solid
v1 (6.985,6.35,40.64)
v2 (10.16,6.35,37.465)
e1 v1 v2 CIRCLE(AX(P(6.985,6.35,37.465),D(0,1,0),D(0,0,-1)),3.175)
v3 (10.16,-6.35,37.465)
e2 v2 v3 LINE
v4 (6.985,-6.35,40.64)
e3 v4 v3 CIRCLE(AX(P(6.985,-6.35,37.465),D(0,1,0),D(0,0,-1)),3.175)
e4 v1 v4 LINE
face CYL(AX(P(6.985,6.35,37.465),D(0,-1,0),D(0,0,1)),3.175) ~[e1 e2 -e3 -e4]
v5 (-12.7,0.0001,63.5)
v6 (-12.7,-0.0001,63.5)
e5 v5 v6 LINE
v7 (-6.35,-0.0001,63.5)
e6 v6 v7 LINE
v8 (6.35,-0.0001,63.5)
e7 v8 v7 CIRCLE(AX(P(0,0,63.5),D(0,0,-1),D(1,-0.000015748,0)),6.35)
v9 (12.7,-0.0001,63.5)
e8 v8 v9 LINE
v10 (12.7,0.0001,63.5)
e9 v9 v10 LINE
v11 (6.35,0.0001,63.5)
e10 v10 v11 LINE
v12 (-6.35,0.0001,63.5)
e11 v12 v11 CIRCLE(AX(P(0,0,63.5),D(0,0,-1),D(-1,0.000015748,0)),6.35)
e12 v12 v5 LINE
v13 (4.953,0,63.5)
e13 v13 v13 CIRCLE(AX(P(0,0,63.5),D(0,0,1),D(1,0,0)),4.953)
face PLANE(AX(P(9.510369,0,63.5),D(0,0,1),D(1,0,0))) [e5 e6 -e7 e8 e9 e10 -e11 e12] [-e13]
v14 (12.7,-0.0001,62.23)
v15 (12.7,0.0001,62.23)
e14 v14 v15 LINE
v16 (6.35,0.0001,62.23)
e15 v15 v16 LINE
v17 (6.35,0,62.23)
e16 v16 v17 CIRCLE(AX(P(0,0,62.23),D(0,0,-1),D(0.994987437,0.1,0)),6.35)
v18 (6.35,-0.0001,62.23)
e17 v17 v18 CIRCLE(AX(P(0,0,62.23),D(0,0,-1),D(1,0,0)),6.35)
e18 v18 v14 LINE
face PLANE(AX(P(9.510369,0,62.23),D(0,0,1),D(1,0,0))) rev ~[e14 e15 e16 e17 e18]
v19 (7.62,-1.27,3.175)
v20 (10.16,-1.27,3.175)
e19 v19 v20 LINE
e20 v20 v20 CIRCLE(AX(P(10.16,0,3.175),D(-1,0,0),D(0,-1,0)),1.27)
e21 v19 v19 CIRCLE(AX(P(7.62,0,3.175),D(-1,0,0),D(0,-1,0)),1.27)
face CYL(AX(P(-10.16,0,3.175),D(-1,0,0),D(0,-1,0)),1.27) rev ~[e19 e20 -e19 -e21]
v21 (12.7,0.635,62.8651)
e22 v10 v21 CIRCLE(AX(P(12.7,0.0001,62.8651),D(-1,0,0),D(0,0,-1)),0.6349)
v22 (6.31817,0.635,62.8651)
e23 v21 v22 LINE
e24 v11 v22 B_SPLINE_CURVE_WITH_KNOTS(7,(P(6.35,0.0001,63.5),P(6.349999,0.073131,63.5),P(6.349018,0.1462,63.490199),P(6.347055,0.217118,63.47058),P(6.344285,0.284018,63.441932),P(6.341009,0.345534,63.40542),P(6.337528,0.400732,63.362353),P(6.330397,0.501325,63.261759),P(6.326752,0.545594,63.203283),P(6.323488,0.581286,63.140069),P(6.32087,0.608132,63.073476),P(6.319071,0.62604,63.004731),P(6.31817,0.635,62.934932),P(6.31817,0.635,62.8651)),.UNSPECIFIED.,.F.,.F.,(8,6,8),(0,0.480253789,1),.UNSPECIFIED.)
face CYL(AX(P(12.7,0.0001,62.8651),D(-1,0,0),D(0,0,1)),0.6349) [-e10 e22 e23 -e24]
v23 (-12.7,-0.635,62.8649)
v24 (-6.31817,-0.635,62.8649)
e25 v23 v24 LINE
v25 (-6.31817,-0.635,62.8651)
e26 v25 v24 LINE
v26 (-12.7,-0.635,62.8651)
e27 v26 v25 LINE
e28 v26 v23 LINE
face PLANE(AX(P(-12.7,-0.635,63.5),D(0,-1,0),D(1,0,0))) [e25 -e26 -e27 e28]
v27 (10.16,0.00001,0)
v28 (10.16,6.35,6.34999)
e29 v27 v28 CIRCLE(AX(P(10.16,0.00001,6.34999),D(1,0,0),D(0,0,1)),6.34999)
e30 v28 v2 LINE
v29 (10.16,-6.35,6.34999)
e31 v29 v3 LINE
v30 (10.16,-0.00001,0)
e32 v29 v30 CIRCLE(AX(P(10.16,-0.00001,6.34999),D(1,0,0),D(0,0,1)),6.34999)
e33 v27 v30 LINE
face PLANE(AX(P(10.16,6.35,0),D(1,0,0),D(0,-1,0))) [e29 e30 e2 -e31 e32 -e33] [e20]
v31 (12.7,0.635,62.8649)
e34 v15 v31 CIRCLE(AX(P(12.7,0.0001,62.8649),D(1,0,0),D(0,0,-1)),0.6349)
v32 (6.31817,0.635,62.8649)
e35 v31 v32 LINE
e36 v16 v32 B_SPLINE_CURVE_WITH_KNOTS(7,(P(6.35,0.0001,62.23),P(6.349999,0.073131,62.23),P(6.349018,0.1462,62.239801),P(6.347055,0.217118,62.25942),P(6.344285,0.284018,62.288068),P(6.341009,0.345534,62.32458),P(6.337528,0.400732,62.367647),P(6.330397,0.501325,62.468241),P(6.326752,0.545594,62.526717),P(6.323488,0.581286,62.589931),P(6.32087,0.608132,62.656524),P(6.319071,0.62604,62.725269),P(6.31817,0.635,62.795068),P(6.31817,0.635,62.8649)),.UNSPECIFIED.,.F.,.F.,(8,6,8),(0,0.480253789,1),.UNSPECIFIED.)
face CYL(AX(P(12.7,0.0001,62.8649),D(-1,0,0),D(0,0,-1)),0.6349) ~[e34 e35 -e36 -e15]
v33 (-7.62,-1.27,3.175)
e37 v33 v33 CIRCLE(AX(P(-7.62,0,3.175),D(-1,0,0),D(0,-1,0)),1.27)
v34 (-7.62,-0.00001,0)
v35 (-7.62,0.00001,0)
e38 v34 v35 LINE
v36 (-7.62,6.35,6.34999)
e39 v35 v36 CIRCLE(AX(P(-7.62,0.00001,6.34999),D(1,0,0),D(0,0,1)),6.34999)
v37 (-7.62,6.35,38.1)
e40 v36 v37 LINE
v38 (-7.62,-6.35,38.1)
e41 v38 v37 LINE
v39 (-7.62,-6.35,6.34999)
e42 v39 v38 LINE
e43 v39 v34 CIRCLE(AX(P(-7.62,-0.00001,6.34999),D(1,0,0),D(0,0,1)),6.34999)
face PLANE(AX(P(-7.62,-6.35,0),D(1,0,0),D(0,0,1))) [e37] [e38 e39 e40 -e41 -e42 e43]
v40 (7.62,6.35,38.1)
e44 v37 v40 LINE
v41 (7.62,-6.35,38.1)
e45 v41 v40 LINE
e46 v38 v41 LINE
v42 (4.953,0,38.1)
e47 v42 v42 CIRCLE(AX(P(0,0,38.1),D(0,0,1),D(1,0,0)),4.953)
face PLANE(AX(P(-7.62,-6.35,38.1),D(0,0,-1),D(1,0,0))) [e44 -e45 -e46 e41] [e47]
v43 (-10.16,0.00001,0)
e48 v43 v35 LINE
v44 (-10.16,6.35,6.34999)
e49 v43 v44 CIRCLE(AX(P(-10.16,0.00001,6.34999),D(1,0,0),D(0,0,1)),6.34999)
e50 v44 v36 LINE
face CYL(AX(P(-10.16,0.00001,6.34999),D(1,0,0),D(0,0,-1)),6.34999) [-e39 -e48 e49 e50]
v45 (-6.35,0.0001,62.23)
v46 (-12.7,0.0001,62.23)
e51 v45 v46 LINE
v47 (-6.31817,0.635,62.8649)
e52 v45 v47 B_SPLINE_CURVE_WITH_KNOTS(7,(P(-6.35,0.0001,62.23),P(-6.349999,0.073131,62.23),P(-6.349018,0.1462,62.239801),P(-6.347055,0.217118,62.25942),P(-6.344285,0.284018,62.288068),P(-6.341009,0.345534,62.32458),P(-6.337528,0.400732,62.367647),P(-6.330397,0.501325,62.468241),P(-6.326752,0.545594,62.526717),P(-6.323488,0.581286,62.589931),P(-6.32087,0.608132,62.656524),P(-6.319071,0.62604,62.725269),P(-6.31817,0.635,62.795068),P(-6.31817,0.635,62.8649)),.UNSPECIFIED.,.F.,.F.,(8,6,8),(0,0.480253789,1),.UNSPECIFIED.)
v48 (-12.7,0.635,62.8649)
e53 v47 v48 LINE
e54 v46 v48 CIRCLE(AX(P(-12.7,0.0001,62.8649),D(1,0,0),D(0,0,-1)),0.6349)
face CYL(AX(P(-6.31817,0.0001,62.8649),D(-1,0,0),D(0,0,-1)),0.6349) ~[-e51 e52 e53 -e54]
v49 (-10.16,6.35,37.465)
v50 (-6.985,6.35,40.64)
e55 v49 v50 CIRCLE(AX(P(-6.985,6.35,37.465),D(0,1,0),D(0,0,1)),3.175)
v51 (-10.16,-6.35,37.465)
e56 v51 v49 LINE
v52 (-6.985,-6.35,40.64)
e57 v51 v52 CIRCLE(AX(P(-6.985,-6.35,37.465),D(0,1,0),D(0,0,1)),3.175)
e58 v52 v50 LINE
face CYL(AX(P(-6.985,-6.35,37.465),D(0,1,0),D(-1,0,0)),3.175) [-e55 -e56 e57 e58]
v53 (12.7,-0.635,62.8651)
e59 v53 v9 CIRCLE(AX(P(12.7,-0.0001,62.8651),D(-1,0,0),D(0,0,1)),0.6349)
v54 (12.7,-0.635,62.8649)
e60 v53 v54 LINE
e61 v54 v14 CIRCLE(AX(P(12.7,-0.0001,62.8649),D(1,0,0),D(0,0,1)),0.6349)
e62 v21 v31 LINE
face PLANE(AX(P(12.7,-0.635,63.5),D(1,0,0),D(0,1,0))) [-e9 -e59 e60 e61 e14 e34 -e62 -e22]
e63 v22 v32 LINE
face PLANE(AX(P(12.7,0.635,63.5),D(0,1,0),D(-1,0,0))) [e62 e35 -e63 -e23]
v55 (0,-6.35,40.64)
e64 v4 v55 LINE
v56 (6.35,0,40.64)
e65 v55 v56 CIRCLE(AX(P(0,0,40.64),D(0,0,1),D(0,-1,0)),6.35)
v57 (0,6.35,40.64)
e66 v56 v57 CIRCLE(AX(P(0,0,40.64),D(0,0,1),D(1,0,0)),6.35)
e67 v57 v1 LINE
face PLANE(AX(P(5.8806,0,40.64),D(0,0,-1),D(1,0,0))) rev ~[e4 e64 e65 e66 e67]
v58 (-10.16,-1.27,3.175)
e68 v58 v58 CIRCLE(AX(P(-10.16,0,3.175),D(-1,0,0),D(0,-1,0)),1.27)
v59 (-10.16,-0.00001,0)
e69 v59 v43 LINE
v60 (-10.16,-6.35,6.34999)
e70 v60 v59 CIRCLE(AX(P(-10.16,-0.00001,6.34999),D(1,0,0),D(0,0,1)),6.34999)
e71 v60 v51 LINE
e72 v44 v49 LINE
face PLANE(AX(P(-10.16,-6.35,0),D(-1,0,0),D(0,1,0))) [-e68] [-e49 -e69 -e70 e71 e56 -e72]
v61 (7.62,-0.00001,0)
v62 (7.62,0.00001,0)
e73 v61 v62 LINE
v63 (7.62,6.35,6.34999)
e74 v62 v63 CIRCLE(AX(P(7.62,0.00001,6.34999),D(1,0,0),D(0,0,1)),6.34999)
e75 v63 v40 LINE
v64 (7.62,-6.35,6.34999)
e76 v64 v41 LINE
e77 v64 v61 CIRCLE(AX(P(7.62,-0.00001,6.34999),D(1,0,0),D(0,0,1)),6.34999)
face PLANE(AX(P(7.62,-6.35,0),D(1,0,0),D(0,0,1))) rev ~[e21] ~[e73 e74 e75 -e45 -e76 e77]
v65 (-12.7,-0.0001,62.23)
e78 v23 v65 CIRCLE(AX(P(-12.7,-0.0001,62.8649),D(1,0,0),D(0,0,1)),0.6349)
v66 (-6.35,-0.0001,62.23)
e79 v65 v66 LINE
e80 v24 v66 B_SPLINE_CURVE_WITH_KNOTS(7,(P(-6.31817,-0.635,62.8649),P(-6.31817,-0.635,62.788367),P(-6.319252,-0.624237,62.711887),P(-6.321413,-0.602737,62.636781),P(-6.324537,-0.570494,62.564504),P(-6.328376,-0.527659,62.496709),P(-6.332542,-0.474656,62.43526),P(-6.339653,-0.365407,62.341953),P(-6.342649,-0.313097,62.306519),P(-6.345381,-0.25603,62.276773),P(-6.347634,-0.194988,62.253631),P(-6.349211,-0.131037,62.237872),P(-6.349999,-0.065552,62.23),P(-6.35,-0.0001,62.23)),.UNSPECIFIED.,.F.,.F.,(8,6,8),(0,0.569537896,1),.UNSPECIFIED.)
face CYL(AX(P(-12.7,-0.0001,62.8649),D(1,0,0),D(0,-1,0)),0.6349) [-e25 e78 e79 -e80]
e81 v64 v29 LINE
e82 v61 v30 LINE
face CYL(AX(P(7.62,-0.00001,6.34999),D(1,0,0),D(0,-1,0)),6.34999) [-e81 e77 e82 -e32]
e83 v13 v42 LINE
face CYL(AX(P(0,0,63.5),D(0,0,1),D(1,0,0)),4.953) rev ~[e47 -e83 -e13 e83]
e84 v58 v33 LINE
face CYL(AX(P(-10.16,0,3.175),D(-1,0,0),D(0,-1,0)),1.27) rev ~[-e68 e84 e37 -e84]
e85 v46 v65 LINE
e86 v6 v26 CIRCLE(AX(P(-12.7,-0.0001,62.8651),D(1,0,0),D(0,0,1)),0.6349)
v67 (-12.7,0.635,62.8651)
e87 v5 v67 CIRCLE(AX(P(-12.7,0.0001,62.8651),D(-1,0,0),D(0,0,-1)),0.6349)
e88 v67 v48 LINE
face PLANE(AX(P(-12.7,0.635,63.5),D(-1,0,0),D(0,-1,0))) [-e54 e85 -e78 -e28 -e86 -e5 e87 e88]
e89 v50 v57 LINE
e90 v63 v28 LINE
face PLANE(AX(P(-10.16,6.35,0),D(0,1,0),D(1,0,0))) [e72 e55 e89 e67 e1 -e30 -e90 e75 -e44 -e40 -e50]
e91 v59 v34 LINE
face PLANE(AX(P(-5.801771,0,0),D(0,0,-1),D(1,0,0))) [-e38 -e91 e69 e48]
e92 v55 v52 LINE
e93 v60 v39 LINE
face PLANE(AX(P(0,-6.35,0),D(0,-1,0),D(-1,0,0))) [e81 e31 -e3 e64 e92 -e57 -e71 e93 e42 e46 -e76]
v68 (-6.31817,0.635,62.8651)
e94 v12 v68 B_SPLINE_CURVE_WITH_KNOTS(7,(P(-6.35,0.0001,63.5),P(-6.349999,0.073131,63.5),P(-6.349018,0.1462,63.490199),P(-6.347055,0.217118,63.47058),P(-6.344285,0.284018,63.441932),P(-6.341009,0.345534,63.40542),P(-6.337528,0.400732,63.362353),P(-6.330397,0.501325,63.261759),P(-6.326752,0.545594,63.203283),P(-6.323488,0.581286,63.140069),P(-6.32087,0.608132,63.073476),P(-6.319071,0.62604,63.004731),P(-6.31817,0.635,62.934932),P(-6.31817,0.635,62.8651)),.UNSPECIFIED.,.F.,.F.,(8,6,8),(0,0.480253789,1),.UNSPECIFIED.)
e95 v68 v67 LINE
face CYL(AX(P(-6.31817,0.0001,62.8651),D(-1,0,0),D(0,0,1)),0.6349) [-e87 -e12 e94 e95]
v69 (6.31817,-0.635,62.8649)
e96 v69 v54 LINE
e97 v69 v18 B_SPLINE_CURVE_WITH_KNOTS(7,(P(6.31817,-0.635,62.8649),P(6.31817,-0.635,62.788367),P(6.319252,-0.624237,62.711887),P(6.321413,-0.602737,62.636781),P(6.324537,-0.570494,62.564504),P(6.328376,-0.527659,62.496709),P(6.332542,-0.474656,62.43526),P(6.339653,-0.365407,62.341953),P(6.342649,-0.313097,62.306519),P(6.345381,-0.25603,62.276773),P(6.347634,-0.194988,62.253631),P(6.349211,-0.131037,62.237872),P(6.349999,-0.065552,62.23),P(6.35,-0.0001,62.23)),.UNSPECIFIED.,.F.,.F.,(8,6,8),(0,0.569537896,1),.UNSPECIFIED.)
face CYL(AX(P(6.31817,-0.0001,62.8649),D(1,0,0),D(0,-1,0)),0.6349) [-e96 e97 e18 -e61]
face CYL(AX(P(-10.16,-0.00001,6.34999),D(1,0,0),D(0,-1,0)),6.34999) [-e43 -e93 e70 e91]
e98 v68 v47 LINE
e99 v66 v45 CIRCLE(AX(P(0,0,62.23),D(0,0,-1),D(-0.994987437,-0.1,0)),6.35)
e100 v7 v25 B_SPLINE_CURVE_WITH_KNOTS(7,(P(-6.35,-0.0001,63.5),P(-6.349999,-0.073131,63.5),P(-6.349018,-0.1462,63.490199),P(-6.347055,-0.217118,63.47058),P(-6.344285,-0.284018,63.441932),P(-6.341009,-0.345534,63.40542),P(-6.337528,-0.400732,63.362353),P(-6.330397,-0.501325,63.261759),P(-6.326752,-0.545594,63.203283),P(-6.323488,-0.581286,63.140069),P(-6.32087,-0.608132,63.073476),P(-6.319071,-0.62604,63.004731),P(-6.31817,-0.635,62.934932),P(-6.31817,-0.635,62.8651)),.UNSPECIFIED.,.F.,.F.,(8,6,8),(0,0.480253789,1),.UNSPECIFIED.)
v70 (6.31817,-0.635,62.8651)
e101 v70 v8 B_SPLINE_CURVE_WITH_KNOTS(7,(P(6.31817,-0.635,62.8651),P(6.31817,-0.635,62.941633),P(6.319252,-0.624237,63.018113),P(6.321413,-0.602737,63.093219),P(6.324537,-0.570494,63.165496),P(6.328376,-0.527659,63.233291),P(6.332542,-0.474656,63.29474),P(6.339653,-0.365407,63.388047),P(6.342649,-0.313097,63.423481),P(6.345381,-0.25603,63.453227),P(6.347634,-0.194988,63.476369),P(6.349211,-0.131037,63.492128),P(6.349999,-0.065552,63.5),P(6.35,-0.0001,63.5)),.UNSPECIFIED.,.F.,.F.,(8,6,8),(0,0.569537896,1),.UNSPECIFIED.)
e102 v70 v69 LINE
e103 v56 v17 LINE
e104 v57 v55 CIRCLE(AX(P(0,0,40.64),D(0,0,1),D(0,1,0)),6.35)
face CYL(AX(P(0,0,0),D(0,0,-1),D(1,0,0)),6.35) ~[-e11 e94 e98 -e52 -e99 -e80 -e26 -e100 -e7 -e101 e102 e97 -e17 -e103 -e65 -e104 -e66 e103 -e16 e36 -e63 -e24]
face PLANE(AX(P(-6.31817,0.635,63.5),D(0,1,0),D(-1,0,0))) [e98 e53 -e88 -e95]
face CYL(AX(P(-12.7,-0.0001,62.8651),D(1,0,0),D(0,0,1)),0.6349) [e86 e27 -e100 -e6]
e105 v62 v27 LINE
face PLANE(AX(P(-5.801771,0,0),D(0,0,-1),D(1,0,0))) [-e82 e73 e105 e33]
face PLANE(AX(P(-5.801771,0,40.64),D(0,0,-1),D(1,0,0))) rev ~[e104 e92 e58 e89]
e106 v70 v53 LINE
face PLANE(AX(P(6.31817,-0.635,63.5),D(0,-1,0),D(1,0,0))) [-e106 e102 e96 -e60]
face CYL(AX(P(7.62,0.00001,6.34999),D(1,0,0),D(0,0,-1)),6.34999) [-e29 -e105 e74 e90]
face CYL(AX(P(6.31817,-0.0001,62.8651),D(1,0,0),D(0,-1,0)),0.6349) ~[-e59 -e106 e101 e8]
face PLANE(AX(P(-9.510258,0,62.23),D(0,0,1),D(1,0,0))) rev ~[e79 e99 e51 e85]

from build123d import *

# Parameters (mm, degrees)
F0_R      = 6.35
F0_R_2    = 0.635
F1_DEPTH  = 63.5
F3_DEPTH  = 1.27
F4_R      = 0.6349
F5_R      = 0.635
F6_DEPTH  = 40.64
F7_R      = 1.27
F8_DEPTH  = 25.4
F9_W      = 15.24
F9_H      = 38.1
F10_DEPTH = 12.7
F11_R     = 4.953
F11_R_2   = 0.635
F12_DEPTH = 25.4
F13_R     = 6.34999
F14_R     = 3.175


# Not quite as in the source:
# - a fillet or chamfer is up to 0.001 mm smaller than in the source, because OpenCascade refuses the exact size


with BuildPart() as f1:
    # F0 (on Top) → F1 (new body)
    with BuildSketch(Plane.XY):
        Circle(F0_R)
        Circle(F0_R_2, mode=Mode.SUBTRACT)
    extrude(amount=F1_DEPTH)

    # F2 (on face) → F3 (join)
    with BuildSketch(Plane.XY.offset(63.5)):
        with BuildLine():
            Line((6.3181702256, -0.635), (12.7, -0.635))
            Line((12.7, -0.635), (12.7, 0.635))
            Line((12.7, 0.635), (6.3181702256, 0.635))
            ThreePointArc((6.3181702256, 0.635), (6.3420375643, 0.3178986216), (6.35, 0))
            ThreePointArc((6.35, 0), (6.3420375643, -0.3178986216), (6.3181702256, -0.635))
        make_face()
        with BuildLine():
            Line((-12.7, -0.635), (-6.3181702256, -0.635))
            ThreePointArc((-6.3181702256, -0.635), (-6.35, 0), (-6.3181702256, 0.635))
            Line((-6.3181702256, 0.635), (-12.7, 0.635))
            Line((-12.7, 0.635), (-12.7, -0.635))
        make_face()
    extrude(amount=-F3_DEPTH)

    # F4 (radius 0.635 in the source; OpenCascade refuses exactly that, so slightly less here)
    f4_edges = [f1.edges().sort_by_distance(p)[0] for p in [
        (9.509085, 0.635, 63.5),
        (9.509085, -0.635, 63.5),
        (-9.509085, 0.635, 63.5),
        (-9.509085, -0.635, 63.5),
        (9.509085, 0.635, 62.23),
        (9.509085, -0.635, 62.23),
        (-9.509085, -0.635, 62.23),
        (-9.509085, 0.635, 62.23),
    ]]
    fillet(f4_edges, radius=F4_R)

    # F5 (on face) → F6 (join)
    with BuildSketch(Plane(origin=(0, 0, 0), x_dir=(1, 0, 0), z_dir=(0, 0, -1))):
        with BuildLine():
            ThreePointArc((0, -6.35), (-6.35, 0), (0, 6.35))
            Line((0, 6.35), (-10.16, 6.35))
            Line((-10.16, 6.35), (-10.16, -6.35))
            Line((-10.16, -6.35), (0, -6.35))
        make_face()
        with BuildLine():
            Line((10.16, -6.35), (10.16, 6.35))
            Line((10.16, 6.35), (0, 6.35))
            ThreePointArc((0, 6.35), (4.4901280605, 4.4901280605), (6.35, 0))
            ThreePointArc((6.35, 0), (4.4901280605, -4.4901280605), (0, -6.35))
            Line((0, -6.35), (10.16, -6.35))
        make_face()
        Circle(F5_R)
    extrude(amount=-F6_DEPTH)

    # F7 (on face) → F8 (cut)
    with BuildSketch(Plane(origin=(-10.16, 0, 0), x_dir=(0, -1, 0), z_dir=(-1, 0, 0))):
        with Locations((0, 3.175)):
            Circle(F7_R)
    extrude(amount=-F8_DEPTH, mode=Mode.SUBTRACT)

    # F9 (on face) → F10 (cut)
    with BuildSketch(Plane.XZ.offset(6.35)):
        with Locations((0, 19.05)):
            Rectangle(F9_W, F9_H)
    extrude(amount=-F10_DEPTH, mode=Mode.SUBTRACT)

    # F11 (on face) → F12 (cut, through all)
    with BuildSketch(Plane.XY.offset(63.5)):
        Circle(F11_R)
        Circle(F11_R_2, mode=Mode.SUBTRACT)
        Circle(F11_R_2)
    extrude(amount=-F12_DEPTH, mode=Mode.SUBTRACT)

    # F13 (radius 6.35 in the source; OpenCascade refuses exactly that, so slightly less here)
    f13_edges = [f1.edges().sort_by_distance(p)[0] for p in [
        (8.89, 6.35, 0),
        (8.89, -6.35, 0),
        (-8.89, -6.35, 0),
        (-8.89, 6.35, 0),
    ]]
    fillet(f13_edges, radius=F13_R)

    # F14
    f14_edges = [f1.edges().sort_by_distance(p)[0] for p in [
        (10.16, 0, 40.64),
        (-10.16, 0, 40.64),
    ]]
    fillet(f14_edges, radius=F14_R)


solid = f1.part
